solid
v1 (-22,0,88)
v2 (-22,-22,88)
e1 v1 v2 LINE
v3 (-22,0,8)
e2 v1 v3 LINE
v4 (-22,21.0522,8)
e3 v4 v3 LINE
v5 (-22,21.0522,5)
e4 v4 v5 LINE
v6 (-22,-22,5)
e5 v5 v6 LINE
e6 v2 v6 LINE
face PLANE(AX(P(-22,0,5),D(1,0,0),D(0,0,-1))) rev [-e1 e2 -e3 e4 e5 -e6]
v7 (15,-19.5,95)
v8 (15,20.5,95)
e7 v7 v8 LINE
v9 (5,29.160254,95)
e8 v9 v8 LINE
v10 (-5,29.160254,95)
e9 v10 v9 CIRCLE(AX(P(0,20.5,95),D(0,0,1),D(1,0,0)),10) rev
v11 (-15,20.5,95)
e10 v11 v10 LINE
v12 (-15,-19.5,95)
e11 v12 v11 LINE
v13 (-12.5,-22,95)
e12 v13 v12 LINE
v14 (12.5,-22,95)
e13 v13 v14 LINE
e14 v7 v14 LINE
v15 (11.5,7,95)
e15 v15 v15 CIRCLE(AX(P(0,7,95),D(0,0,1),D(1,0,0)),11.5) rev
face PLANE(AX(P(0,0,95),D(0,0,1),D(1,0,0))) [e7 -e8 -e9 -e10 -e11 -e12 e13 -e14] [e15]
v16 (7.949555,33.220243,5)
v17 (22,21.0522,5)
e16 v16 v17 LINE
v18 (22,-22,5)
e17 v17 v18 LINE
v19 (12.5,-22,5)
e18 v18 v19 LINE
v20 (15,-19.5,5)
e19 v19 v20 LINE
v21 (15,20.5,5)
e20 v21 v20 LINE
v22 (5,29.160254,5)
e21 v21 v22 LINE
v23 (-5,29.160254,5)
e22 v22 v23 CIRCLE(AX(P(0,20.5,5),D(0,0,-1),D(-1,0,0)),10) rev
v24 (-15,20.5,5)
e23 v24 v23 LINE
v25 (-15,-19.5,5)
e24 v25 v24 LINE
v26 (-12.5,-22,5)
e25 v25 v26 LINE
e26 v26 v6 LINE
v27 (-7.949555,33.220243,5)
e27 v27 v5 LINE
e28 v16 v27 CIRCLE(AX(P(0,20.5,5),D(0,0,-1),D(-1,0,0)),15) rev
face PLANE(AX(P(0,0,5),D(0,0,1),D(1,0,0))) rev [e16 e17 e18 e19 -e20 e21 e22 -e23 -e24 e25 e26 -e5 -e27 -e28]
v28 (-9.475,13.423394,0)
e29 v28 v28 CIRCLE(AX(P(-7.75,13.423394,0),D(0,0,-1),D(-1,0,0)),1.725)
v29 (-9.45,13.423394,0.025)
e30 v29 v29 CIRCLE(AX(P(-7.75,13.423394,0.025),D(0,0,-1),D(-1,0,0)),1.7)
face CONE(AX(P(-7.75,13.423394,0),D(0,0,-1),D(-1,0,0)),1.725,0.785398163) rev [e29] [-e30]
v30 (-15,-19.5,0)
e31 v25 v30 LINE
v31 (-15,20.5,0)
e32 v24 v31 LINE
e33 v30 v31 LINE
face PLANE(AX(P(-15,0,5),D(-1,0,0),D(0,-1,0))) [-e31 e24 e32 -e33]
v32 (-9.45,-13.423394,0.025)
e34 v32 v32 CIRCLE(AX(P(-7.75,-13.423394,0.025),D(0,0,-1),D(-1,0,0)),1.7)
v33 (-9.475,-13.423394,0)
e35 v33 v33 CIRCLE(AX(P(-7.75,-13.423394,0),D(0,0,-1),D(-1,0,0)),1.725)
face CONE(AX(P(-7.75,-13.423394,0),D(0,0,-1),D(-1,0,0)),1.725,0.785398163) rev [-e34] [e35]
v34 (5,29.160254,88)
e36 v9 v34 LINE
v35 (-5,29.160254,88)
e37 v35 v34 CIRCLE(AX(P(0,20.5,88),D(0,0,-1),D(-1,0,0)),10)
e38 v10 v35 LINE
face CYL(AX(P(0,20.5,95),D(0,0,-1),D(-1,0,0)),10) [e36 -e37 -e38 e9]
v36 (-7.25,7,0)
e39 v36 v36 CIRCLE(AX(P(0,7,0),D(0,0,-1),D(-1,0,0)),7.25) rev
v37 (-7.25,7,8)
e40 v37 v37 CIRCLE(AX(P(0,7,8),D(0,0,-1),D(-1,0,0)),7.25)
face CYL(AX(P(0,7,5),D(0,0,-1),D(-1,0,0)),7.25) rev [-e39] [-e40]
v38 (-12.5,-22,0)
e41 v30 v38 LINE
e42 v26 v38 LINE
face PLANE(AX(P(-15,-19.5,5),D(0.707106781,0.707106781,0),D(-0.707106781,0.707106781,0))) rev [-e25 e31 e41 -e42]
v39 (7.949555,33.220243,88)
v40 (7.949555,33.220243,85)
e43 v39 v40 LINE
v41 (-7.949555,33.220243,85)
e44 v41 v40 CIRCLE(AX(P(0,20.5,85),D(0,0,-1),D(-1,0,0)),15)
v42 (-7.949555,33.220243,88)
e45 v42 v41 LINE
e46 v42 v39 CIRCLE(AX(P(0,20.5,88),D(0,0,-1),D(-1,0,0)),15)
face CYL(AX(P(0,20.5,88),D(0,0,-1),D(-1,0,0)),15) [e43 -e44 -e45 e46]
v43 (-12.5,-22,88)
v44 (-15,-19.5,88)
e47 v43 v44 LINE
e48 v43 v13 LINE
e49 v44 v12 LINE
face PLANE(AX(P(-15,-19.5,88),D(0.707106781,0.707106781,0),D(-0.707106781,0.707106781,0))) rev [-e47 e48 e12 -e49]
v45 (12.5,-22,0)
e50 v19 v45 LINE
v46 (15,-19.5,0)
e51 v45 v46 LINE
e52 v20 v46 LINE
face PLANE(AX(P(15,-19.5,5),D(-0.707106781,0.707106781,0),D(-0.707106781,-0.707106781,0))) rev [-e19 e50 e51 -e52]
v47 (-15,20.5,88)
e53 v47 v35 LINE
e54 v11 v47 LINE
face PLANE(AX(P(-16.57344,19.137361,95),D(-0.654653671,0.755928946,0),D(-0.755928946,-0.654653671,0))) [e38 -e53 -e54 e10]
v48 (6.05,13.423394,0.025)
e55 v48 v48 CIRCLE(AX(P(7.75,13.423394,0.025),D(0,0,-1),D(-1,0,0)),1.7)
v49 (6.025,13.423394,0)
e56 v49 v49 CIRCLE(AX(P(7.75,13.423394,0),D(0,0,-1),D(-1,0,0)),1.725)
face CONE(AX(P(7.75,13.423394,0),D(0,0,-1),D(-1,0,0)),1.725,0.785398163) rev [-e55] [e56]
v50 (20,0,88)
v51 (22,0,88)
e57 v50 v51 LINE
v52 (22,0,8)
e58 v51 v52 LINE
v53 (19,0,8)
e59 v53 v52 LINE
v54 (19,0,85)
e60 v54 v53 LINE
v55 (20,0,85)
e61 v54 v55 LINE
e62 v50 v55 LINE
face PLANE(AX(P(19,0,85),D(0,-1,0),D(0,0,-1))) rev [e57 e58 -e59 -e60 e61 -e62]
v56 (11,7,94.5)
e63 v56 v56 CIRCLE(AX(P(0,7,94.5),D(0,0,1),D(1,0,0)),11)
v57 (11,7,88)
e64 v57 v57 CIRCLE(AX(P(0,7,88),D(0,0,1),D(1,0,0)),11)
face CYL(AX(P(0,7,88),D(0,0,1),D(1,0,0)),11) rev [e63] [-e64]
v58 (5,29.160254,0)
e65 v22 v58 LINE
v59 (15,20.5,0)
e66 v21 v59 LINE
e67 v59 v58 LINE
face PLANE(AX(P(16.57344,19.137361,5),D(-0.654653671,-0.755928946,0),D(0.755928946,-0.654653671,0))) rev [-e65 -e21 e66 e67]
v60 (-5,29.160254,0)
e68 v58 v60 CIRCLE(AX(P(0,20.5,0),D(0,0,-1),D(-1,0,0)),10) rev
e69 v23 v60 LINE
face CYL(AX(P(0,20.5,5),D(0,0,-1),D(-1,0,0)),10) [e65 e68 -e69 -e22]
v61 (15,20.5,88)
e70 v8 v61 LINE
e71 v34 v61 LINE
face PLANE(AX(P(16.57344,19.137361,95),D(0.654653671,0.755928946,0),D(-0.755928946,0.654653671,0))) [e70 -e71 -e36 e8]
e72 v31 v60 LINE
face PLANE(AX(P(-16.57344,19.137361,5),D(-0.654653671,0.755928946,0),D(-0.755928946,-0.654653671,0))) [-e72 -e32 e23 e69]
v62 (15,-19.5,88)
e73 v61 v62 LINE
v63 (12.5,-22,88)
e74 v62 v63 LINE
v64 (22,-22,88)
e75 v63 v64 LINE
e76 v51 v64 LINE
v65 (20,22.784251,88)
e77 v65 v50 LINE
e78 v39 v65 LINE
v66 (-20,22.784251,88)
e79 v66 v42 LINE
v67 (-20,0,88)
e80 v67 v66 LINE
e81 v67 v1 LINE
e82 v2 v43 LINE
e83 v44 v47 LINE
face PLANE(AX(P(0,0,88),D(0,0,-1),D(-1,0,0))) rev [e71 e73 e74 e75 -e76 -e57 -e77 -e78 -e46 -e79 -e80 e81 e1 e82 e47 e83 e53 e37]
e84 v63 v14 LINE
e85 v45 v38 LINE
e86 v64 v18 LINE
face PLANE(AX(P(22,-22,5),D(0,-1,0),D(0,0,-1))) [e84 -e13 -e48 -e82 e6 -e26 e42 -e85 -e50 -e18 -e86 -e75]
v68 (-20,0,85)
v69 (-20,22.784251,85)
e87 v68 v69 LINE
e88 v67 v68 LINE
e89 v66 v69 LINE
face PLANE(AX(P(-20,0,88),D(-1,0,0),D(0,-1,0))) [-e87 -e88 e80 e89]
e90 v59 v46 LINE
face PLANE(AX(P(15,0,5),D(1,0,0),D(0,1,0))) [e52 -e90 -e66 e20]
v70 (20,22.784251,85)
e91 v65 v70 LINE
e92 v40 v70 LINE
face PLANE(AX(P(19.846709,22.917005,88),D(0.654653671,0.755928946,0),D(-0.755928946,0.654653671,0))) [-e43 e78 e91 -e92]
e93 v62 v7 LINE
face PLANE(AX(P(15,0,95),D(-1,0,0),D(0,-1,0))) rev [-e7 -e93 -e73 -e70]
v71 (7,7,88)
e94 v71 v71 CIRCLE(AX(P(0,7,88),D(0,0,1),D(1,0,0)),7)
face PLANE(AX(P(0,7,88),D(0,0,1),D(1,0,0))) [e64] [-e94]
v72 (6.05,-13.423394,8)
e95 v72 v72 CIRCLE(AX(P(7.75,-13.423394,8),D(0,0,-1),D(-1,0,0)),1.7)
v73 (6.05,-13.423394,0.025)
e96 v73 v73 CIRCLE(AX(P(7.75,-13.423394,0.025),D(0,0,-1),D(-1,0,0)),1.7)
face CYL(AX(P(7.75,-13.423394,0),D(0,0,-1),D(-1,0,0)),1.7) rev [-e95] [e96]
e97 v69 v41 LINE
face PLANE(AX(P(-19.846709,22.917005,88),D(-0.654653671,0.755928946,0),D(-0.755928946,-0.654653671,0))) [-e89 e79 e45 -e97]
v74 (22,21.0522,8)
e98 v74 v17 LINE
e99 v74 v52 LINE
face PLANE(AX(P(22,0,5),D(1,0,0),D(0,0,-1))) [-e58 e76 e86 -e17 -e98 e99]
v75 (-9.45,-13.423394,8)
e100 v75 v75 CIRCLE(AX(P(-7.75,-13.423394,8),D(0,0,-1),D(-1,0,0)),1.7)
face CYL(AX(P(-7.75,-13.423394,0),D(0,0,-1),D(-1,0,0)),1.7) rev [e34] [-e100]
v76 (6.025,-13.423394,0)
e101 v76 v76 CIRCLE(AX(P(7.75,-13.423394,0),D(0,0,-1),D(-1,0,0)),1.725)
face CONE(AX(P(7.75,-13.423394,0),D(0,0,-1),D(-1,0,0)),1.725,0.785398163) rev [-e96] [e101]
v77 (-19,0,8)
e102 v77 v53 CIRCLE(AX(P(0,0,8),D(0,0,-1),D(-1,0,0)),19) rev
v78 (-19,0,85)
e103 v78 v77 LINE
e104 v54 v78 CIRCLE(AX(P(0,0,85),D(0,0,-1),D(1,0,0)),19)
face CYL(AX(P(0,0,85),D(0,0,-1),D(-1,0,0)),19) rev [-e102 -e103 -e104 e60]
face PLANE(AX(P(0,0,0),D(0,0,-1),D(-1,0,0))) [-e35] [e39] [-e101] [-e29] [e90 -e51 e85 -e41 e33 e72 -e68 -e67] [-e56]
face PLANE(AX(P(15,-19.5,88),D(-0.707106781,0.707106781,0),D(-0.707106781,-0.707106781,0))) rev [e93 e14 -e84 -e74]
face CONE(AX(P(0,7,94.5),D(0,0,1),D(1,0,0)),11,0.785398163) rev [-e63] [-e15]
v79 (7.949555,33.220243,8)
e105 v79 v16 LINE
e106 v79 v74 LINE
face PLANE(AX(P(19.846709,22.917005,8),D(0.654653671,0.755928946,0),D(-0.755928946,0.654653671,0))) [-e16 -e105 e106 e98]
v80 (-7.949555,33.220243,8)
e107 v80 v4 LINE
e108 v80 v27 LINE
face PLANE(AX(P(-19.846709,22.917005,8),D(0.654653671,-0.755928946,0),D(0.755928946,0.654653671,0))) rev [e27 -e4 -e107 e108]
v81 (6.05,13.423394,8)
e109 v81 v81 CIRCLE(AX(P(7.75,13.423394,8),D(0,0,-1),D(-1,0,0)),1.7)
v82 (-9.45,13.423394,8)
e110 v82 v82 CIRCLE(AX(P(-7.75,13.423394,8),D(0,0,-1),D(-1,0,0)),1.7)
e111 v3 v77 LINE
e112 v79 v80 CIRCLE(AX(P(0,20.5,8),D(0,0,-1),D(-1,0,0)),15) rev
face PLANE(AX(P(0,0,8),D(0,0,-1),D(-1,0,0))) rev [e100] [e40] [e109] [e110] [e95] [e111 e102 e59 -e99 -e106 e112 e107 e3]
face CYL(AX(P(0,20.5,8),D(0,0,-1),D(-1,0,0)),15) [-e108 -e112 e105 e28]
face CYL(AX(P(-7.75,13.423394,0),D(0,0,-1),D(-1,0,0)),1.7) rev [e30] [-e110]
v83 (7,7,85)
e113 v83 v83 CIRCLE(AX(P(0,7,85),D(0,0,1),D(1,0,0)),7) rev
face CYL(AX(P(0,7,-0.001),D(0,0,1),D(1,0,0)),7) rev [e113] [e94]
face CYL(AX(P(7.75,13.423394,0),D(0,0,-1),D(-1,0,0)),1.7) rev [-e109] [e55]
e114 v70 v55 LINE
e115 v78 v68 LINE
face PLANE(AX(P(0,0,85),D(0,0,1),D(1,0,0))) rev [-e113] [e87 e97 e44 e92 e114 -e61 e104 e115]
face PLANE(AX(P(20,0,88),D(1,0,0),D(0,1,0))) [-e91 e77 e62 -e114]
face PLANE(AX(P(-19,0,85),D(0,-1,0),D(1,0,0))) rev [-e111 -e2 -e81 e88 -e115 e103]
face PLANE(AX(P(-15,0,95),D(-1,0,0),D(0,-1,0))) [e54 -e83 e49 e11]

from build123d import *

# Parameters (mm, degrees)
SKETCH3_R                      = 7.25
BOSS_EXTRUDE1_DEPTH            = 5
BOSS_EXTRUDE2_DEPTH            = 80
BOSS_EXTRUDE3_DEPTH            = 10
SKETCH16_R                     = 11
CUT_EXTRUDE1_DEPTH             = 7
CUT_EXTRUDE2_REACH             = 97.699
SKETCH17_R                     = 7
CHAMFER2_SIZE                  = 0.5
CHAMFER3_SIZE                  = 0.5
BOSS_EXTRUDE7_DEPTH            = 3
CUT_EXTRUDE7_DEPTH             = 7
SKETCH3_6_R                    = 7.25
CUT_EXTRUDE6_DEPTH             = 5
BOSS_EXTRUDE8_START            = -5
BOSS_EXTRUDE8_OUTLINE_R        = 7.25
BOSS_EXTRUDE8_DEPTH            = 5
SKETCH24_R                     = 7.25
BOSS_EXTRUDE12_DEPTH           = 3
M3_CLEARANCE_HOLE1_D           = 3.4
M3_CLEARANCE_HOLE1_DEPTH       = 10
M3_CLEARANCE_HOLE1_CSINK_D     = 3.45
M3_CLEARANCE_HOLE1_CSINK_ANGLE = 90
M3_CLEARANCE_HOLE1_TIP         = 1.021463052
CUT_EXTRUDE8_DEPTH             = 5


# Read off the part's stored shape, not the designer's step: Boss-Extrude8
with BuildPart() as part:
    # Sketch3 → Boss-Extrude1 (new body)
    with BuildSketch(Plane.XY):
        with BuildLine():
            Line((22, 0), (22, -22))
            Line((22, -22), (-22, -22))
            Line((-22, -22), (-22, 0))
            ThreePointArc((-22, 0), (0, 22), (22, 0))
        make_face()
        with Locations((0, 7)):
            Circle(SKETCH3_R, mode=Mode.SUBTRACT)
    extrude(amount=BOSS_EXTRUDE1_DEPTH)

    # Sketch7 → Boss-Extrude2 (add)
    with BuildSketch(Plane.XY.offset(5)):
        with BuildLine():
            Line((-19, 0), (-22, 0))
            Line((-22, 0), (-22, -22))
            Line((-22, -22), (22, -22))
            Line((22, -22), (22, 0))
            Line((22, 0), (19, 0))
            ThreePointArc((19, 0), (0, -19), (-19, 0))
        make_face()
    extrude(amount=BOSS_EXTRUDE2_DEPTH)

    # Sketch9 → Boss-Extrude3 (add)
    with BuildSketch(Plane.XY.offset(85)):
        with BuildLine():
            Line((-15, 20.5), (-15, -22))
            Line((-15, -22), (15, -22))
            Line((15, -22), (15, 20.5))
            Line((15, 20.5), (5, 29.160254038))
            ThreePointArc((5, 29.160254038), (0, 30.5), (-5, 29.160254038))
            Line((-5, 29.160254038), (-15, 20.5))
        make_face()
    extrude(amount=BOSS_EXTRUDE3_DEPTH)

    # Sketch16 → Cut-Extrude1 (cut)
    with BuildSketch(Plane.XY.offset(95)):
        with Locations((0, 7)):
            Circle(SKETCH16_R)
    extrude(amount=-CUT_EXTRUDE1_DEPTH, mode=Mode.SUBTRACT)

    # Sketch17 → Cut-Extrude2 (cut, up to next)
    with BuildSketch(Plane.XY.offset(88), mode=Mode.PRIVATE) as cut_extrude2_sk1:
        with Locations((0, 7)):
            Circle(SKETCH17_R)
    cut_extrude2_tool1 = extrude(cut_extrude2_sk1.sketch, amount=-CUT_EXTRUDE2_REACH, mode=Mode.PRIVATE) & part.part
    add(cut_extrude2_tool1.solids().sort_by_distance((0, 7, 88))[0], mode=Mode.SUBTRACT)

    # Chamfer2
    chamfer2_edges = [part.edges().sort_by_distance(p)[0] for p in [
        (-11, 7, 95),
    ]]
    chamfer(chamfer2_edges, length=CHAMFER2_SIZE)

    # Chamfer3
    chamfer3_edges = [part.edges().sort_by_distance(p)[0] for p in [
        (-7.25, 7, 5),
    ]]
    chamfer(chamfer3_edges, length=CHAMFER3_SIZE)

    # Sketch22 → Boss-Extrude7 (add)
    with BuildSketch(Plane(origin=(0, 0, 85), x_dir=(-1, 0, 0), z_dir=(0, 0, -1))):
        with BuildLine():
            Line((-20, 22.784251259), (-20, 0))
            Line((-20, 0), (-20, -11.66190379))
            Line((-20, -11.66190379), (-20, -22))
            Line((-20, -22), (-15, -22))
            Line((-15, -22), (-15, -11.66190379))
            Line((-15, -11.66190379), (-15, 20.5))
            Line((-15, 20.5), (-5, 29.160254038))
            ThreePointArc((-5, 29.160254038), (0, 30.5), (5, 29.160254038))
            Line((5, 29.160254038), (15, 20.5))
            Line((15, 20.5), (15, -11.66190379))
            Line((15, -11.66190379), (15, -22))
            Line((15, -22), (20, -22))
            Line((20, -22), (20, -11.66190379))
            Line((20, -11.66190379), (20, 0))
            Line((20, 0), (20, 22.784251259))
            Line((20, 22.784251259), (7.949555075, 33.220242691))
            ThreePointArc((7.949555075, 33.220242691), (0, 35.5), (-7.949555075, 33.220242691))
            Line((-7.949555075, 33.220242691), (-20, 22.784251259))
        make_face()
        Polygon((22, 0), (20, 0), (20, -11.66190379), (20, -22), (22, -22), align=None)
        Polygon((-20, -11.66190379), (-20, 0), (-22, 0), (-22, -22), (-20, -22), align=None)
    extrude(amount=-BOSS_EXTRUDE7_DEPTH)

    # Sketch25 → Cut-Extrude7 (cut)
    with BuildSketch(Plane.XY.offset(95)):
        Polygon((-15, -19.5), (-12.5, -22), (-15, -22), align=None)
        Polygon((15, -19.5), (12.5, -22), (15, -22), align=None)
    extrude(amount=-CUT_EXTRUDE7_DEPTH, mode=Mode.SUBTRACT)

    # Sketch3<6> → Cut-Extrude6 (cut)
    # profile 1 of 3: a face of its own
    with BuildSketch(Plane.XY):
        with BuildLine():
            ThreePointArc((0, -22), (15.556349186, -15.556349186), (22, 0))
            ThreePointArc((22, 0), (0, 22), (-22, 0))
            ThreePointArc((-22, 0), (-15.556349186, -15.556349186), (0, -22))
        make_face()
        with Locations((0, 7)):
            Circle(SKETCH3_6_R, mode=Mode.SUBTRACT)
    # profile 2 of 3: a face of its own
    with BuildSketch(Plane.XY):
        with BuildLine():
            ThreePointArc((0, -22), (-15.556349186, -15.556349186), (-22, 0))
            Line((-22, 0), (-22, -22))
            Line((-22, -22), (0, -22))
        make_face()
    # profile 3 of 3: a face of its own
    with BuildSketch(Plane.XY):
        with BuildLine():
            Line((22, -22), (22, 0))
            ThreePointArc((22, 0), (15.556349186, -15.556349186), (0, -22))
            Line((0, -22), (22, -22))
        make_face()
    extrude(amount=CUT_EXTRUDE6_DEPTH, mode=Mode.SUBTRACT)

    # Boss-Extrude8 outline → Boss-Extrude8 (add)
    with BuildSketch(Plane(origin=(0, 0, 0), x_dir=(-1, 0, 0), z_dir=(0, 0, -1)).offset(BOSS_EXTRUDE8_START)):
        with BuildLine():
            Line((15, 20.5), (5, 29.160254038))
            ThreePointArc((5, 29.160254038), (0, 30.5), (-5, 29.160254038))
            Line((-5, 29.160254038), (-15, 20.5))
            Line((-15, 20.5), (-15, -22))
            Line((-15, -22), (15, -22))
            Line((15, -22), (15, 20.5))
        make_face()
        with Locations((0, 7)):
            Circle(BOSS_EXTRUDE8_OUTLINE_R, mode=Mode.SUBTRACT)
    extrude(amount=BOSS_EXTRUDE8_DEPTH)

    # Sketch24 → Boss-Extrude12 (add)
    with BuildSketch(Plane(origin=(0, 0, 5), x_dir=(-1, 0, 0), z_dir=(0, 0, -1))):
        with BuildLine():
            Line((-7.949555075, 33.220242691), (-20, 22.784251259))
            Line((-20, 22.784251259), (-22, 21.052200451))
            Line((-22, 21.052200451), (-22, 0))
            Line((-22, 0), (-22, -22))
            Line((-22, -22), (22, -22))
            Line((22, -22), (22, 0))
            Line((22, 0), (22, 21.052200451))
            Line((22, 21.052200451), (20, 22.784251259))
            Line((20, 22.784251259), (7.949555075, 33.220242691))
            ThreePointArc((7.949555075, 33.220242691), (0, 35.5), (-7.949555075, 33.220242691))
        make_face()
        with Locations((0, 7)):
            Circle(SKETCH24_R, mode=Mode.SUBTRACT)
    extrude(amount=-BOSS_EXTRUDE12_DEPTH)

    # M3 Clearance Hole1
    with Locations(Plane(origin=(0, 0, 0), x_dir=(-1, 0, 0), z_dir=(0, 0, -1))):
        with Locations((7.75, 13.423393759), (-7.75, 13.423393759), (-7.75, -13.423393759), (7.75, -13.423393759)):
            CounterSinkHole(M3_CLEARANCE_HOLE1_D / 2, M3_CLEARANCE_HOLE1_CSINK_D / 2, depth=M3_CLEARANCE_HOLE1_DEPTH, counter_sink_angle=M3_CLEARANCE_HOLE1_CSINK_ANGLE)
            with Locations((0, 0, -(M3_CLEARANCE_HOLE1_DEPTH + M3_CLEARANCE_HOLE1_TIP / 2))):  # 118° drill point
                Cone(0, M3_CLEARANCE_HOLE1_D / 2, M3_CLEARANCE_HOLE1_TIP, mode=Mode.SUBTRACT)

    # Sketch26 → Cut-Extrude8 (cut)
    with BuildSketch(Plane(origin=(0, 0, 0), x_dir=(-1, 0, 0), z_dir=(0, 0, -1))):
        Polygon((-15, -19.5), (-12.5, -22), (-15, -22), align=None)
        Polygon((15, -19.5), (12.5, -22), (15, -22), align=None)
    extrude(amount=-CUT_EXTRUDE8_DEPTH, mode=Mode.SUBTRACT)


solid = part.part
